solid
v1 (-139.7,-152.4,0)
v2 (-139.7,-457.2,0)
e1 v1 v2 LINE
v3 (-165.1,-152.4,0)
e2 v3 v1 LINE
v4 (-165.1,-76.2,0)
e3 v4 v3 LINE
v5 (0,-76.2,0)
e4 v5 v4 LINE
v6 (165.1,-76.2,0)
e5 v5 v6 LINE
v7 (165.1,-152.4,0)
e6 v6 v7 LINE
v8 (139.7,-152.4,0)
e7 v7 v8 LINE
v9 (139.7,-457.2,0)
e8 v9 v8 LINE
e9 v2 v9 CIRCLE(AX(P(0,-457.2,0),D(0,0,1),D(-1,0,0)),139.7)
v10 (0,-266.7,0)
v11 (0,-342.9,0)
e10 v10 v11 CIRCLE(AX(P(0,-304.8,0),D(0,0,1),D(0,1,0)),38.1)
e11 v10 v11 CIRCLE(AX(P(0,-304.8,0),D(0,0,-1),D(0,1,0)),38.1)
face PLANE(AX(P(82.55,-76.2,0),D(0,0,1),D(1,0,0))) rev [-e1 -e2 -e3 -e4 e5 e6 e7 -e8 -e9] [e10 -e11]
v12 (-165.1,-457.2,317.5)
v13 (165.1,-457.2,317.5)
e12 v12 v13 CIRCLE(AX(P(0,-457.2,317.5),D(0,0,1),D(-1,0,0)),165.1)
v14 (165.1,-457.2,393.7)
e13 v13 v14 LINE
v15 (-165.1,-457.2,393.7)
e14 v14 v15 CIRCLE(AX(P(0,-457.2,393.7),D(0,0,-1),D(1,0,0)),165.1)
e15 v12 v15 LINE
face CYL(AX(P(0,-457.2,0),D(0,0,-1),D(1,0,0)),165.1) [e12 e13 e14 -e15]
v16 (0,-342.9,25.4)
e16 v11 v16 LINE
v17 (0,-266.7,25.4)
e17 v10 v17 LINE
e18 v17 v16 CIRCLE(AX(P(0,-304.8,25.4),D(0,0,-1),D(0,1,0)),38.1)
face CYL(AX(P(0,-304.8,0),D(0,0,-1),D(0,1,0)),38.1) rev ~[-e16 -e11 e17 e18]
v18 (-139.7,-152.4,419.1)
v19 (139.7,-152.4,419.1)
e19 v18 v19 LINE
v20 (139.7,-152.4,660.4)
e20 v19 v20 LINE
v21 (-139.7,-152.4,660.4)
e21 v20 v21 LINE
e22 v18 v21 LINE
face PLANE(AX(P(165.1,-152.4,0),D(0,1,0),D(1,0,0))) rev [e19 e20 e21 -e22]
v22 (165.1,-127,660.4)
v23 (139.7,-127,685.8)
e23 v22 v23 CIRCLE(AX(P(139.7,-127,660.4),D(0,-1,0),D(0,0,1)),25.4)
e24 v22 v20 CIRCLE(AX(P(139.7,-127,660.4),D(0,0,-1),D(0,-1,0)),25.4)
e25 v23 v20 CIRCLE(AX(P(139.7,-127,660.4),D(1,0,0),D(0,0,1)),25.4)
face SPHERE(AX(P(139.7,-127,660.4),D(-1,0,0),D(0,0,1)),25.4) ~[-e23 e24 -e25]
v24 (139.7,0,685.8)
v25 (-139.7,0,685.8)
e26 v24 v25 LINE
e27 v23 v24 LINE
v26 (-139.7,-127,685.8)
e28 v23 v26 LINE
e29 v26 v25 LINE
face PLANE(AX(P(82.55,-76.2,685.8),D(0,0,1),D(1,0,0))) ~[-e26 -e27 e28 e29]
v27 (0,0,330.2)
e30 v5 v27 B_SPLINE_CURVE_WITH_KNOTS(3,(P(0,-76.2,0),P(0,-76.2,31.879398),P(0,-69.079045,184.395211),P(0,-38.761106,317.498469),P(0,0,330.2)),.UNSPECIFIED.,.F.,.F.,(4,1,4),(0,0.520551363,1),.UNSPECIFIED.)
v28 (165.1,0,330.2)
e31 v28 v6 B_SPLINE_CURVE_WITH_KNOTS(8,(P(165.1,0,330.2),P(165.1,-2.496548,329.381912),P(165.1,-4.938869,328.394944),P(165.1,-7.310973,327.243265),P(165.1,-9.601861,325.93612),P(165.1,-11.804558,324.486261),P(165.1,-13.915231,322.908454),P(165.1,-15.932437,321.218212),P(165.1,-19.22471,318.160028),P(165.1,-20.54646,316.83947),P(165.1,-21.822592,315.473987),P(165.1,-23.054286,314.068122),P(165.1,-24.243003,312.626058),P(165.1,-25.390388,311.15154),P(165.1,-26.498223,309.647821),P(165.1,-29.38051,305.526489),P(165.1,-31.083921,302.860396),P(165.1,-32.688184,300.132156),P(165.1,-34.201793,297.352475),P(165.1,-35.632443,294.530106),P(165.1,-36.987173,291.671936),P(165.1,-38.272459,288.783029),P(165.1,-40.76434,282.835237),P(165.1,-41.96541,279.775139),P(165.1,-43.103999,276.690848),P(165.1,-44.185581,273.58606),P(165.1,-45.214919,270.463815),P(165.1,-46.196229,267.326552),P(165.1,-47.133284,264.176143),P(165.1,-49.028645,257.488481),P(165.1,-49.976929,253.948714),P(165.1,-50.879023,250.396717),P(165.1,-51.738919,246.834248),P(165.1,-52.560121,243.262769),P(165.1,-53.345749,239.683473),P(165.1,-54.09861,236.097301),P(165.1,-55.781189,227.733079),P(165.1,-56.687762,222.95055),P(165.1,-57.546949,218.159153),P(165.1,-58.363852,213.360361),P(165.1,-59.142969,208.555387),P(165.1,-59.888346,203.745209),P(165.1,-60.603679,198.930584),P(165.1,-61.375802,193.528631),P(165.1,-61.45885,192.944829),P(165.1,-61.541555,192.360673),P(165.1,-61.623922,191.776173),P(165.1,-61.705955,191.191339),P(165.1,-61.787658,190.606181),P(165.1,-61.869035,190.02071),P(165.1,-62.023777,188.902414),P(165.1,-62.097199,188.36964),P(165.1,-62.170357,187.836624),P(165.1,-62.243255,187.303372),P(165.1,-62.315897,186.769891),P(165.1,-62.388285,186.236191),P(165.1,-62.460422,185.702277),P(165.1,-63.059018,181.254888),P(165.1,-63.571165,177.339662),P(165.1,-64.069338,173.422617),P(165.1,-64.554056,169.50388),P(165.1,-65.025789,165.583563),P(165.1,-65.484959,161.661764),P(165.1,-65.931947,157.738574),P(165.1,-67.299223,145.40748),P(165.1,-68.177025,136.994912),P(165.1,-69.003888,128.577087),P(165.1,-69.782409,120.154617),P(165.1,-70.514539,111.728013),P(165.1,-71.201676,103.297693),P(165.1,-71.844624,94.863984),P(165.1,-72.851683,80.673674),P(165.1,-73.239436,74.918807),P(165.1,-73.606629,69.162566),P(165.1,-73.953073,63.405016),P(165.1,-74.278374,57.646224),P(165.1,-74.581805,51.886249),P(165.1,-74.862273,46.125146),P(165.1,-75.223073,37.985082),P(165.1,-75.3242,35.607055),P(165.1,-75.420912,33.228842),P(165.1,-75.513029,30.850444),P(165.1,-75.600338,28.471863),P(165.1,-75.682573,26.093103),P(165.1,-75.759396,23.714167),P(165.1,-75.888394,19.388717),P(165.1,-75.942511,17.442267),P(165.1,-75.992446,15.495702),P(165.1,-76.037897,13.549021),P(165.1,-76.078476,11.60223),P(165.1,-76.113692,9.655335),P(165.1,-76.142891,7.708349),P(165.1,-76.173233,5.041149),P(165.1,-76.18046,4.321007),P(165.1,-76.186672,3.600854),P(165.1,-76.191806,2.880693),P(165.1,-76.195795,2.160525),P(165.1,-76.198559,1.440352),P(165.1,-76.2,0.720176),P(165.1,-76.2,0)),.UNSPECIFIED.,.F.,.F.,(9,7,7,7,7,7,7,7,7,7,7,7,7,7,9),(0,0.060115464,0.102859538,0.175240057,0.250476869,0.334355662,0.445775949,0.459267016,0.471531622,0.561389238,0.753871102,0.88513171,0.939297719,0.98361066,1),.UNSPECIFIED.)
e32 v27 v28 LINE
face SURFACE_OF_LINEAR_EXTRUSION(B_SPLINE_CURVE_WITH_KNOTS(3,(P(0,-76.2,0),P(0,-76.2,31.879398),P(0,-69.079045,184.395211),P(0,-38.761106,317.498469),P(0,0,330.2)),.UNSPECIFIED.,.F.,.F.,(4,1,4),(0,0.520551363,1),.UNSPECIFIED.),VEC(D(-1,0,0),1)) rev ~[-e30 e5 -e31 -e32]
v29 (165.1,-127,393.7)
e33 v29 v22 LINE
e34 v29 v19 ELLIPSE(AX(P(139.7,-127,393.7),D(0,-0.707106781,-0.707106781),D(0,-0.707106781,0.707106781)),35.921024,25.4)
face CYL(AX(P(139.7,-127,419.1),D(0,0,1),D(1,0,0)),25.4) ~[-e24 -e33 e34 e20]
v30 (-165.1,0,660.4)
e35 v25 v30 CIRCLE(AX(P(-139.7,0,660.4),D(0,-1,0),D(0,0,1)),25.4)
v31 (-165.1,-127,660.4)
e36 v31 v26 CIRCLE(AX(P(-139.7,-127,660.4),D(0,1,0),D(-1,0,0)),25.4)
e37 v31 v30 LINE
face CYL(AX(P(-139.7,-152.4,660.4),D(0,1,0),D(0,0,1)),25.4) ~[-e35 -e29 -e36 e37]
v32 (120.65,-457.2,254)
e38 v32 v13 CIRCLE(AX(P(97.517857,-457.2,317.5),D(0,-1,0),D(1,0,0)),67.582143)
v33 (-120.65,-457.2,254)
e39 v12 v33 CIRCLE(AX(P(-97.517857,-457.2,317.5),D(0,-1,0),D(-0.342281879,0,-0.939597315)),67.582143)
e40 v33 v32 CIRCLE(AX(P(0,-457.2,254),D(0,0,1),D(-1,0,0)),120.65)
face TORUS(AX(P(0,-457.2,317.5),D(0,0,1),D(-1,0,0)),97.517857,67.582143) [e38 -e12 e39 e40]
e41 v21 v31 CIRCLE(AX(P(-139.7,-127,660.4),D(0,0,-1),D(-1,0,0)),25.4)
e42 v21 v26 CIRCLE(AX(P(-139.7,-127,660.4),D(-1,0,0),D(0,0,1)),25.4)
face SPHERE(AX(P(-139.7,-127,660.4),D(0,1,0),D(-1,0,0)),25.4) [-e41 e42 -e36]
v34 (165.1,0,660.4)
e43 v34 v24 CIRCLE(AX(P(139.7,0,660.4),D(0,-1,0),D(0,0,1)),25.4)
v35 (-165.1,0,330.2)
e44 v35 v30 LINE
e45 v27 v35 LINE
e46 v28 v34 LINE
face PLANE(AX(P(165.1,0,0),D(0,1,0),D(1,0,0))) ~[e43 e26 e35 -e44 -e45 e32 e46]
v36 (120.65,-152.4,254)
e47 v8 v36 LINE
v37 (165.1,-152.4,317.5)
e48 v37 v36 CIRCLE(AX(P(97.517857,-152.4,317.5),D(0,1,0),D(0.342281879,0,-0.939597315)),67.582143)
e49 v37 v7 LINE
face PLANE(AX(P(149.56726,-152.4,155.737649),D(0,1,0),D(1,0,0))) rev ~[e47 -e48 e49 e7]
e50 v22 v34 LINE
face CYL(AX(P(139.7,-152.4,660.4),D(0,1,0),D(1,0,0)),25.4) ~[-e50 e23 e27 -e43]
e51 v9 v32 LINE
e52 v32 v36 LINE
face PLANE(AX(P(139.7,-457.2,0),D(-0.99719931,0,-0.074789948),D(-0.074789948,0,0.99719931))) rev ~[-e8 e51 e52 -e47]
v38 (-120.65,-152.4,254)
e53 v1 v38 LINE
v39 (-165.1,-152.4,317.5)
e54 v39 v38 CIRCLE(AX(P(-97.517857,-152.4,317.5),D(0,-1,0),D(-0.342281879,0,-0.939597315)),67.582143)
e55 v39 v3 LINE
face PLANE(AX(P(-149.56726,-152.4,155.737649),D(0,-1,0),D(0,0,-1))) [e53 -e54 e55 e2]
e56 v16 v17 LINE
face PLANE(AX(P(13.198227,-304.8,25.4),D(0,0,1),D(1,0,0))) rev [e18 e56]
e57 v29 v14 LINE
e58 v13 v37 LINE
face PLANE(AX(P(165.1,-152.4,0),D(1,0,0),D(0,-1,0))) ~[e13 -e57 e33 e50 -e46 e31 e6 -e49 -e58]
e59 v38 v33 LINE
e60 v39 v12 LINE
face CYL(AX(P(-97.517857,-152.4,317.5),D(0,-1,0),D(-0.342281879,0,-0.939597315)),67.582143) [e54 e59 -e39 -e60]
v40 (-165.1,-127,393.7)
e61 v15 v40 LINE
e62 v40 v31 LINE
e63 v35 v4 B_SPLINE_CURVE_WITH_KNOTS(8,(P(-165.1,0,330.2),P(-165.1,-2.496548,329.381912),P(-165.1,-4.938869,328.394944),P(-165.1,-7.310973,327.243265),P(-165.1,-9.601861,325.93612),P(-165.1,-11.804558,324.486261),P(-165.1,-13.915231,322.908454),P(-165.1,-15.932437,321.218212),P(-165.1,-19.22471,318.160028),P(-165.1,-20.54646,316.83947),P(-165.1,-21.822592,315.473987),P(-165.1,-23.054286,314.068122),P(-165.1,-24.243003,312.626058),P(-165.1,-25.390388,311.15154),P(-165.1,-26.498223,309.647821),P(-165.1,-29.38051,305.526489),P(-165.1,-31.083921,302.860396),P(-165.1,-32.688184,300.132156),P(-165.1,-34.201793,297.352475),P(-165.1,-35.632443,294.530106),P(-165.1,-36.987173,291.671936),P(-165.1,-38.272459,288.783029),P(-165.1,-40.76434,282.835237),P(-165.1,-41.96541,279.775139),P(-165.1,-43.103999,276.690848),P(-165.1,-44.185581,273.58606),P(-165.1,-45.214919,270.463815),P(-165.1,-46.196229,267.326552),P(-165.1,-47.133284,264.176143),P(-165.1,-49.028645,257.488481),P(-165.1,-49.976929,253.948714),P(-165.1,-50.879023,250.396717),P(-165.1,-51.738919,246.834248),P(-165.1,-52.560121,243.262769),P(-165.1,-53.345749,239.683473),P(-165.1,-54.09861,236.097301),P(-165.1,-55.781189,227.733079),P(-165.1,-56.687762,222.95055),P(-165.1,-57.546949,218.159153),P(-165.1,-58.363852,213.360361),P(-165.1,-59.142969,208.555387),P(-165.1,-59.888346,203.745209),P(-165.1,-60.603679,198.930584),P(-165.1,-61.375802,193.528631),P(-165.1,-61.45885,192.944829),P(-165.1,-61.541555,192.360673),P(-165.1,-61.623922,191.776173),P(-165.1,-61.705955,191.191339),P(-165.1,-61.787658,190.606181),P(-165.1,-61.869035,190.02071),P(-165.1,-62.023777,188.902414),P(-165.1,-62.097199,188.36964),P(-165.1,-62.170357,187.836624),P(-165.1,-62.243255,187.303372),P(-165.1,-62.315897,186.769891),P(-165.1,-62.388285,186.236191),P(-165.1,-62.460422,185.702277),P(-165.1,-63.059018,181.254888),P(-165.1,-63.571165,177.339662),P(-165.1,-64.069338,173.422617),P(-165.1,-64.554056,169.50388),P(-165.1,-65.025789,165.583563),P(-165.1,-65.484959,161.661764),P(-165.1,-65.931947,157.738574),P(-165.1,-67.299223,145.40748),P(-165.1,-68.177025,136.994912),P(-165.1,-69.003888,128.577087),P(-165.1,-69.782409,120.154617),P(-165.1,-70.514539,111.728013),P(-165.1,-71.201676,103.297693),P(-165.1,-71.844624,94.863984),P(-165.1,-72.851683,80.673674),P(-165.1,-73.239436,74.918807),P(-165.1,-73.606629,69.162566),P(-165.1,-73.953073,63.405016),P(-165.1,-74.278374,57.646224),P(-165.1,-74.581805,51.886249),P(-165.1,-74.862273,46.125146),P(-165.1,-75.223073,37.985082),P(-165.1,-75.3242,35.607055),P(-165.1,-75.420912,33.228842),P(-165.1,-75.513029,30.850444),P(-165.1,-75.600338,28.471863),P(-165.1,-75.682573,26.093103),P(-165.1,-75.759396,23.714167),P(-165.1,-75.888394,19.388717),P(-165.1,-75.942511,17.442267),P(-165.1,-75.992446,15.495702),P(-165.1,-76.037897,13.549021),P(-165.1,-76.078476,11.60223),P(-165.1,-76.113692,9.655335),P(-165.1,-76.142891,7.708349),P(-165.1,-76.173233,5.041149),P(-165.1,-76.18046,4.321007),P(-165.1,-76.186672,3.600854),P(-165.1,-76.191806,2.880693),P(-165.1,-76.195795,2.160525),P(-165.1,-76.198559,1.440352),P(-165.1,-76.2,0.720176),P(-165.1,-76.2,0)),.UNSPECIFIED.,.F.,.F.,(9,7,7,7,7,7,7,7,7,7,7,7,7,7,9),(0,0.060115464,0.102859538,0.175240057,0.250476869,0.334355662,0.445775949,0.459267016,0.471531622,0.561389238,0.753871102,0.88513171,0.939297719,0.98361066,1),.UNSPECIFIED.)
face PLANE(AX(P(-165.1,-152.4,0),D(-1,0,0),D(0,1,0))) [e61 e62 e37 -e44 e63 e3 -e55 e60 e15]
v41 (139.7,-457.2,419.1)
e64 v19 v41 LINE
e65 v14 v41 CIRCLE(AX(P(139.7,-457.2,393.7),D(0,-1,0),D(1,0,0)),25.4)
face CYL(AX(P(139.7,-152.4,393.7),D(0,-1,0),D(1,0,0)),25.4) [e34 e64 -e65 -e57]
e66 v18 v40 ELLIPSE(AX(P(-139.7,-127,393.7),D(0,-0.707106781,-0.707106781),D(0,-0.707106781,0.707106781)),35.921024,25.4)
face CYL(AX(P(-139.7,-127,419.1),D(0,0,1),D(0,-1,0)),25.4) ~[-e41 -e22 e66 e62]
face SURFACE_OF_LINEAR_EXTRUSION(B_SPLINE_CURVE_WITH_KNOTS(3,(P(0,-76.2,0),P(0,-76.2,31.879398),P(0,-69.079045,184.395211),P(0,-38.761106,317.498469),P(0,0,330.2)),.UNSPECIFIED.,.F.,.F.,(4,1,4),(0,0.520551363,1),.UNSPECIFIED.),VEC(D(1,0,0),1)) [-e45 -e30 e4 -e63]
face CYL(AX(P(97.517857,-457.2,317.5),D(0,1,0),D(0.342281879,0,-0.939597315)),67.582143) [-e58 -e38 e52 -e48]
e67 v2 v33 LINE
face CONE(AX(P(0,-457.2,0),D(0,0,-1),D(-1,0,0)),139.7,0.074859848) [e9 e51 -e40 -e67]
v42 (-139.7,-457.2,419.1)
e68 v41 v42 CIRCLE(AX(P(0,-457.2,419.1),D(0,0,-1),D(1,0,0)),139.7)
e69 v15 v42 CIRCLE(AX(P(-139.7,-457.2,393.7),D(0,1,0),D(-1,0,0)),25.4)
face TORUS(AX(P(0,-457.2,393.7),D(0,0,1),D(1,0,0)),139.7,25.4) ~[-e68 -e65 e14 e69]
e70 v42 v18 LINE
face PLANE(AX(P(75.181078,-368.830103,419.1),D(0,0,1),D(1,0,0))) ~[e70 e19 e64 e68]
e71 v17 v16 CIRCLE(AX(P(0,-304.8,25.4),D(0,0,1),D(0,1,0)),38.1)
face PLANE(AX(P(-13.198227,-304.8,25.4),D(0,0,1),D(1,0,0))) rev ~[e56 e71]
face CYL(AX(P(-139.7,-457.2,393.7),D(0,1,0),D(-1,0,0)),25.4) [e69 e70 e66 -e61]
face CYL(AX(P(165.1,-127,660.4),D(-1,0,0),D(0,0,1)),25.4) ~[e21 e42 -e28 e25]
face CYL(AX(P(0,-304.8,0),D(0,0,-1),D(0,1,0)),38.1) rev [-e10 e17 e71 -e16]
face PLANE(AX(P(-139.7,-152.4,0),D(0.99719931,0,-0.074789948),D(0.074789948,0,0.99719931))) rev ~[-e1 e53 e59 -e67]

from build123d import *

# Parameters (mm, degrees)
F0_R          = 12.7
F1_DEPTH      = 419.1
F0_W          = 165.1
F0_H          = 152.4
F2_DEPTH      = 685.8
F3_DEPTH      = 25.4
F8_DEPTH      = 165.1010001
F8_DEPTH_BACK = 165.1010001
F9_R          = 25.4


with BuildPart() as f1:
    # F0 (on Top) → F1 (new body)
    with BuildSketch(Plane.XY):
        with BuildLine():
            Line((0, -266.7), (0, -152.4))
            Line((0, -152.4), (-165.1, -152.4))
            Line((-165.1, -152.4), (-165.1, -457.2))
            ThreePointArc((-165.1, -457.2), (-116.7433295739, -573.9433295739), (0, -622.3))
            Line((0, -622.3), (0, -342.9))
            ThreePointArc((0, -342.9), (-38.1, -304.8), (0, -266.7))
        make_face()
        with Locations((-101.6, -203.2)):
            Circle(F0_R, mode=Mode.SUBTRACT)
        with Locations((-101.6, -203.2)):
            Circle(F0_R)
        with BuildLine():
            Line((0, -342.9), (0, -266.7))
            ThreePointArc((0, -266.7), (-38.1, -304.8), (0, -342.9))
        make_face()
    extrude(amount=F1_DEPTH)

    # F0 (on Top) → F2 (join)
    with BuildSketch(Plane.XY):
        with Locations((-82.55, -76.2)):
            Rectangle(F0_W, F0_H)
    extrude(amount=F2_DEPTH)

    # F0 (on Top) → F3 (cut)
    with BuildSketch(Plane.XY):
        with BuildLine():
            Line((0, -342.9), (0, -266.7))
            ThreePointArc((0, -266.7), (-38.1, -304.8), (0, -342.9))
        make_face()
    extrude(amount=F3_DEPTH, mode=Mode.SUBTRACT)

    # F4: F1 across face


with BuildPart() as f1_1:
    add(f1.part)
    add(f1.part.mirror(Plane(origin=(0, -279.3076736672, 257.3545234249), x_dir=(0, 1, 0), z_dir=(1, 0, 0))))

    # F6: sweep along a path in F6_path
    with BuildLine(Plane(origin=(-165.1, -152.4, 419.1), x_dir=(0, 1, 0), z_dir=(0, 0, 1))) as f6_path:
        Line((0, 0), (-304.8, 0))
        ThreePointArc((-304.8, 0), (-469.9, -165.1), (-304.8, -330.2))
        Line((-304.8, -330.2), (0, -330.2))
    # F5 (on face) → F6 (sweep, cut)
    with BuildSketch(Plane.XZ.offset(152.4)):
        with BuildLine():
            ThreePointArc((-120.65, 254), (-152.8833058285, 278.74418592), (-165.1, 317.5))
            Line((-165.1, 317.5), (-165.1, 0))
            Line((-165.1, 0), (-139.7, 0))
            Line((-139.7, 0), (-120.65, 254))
        make_face()
    sweep(path=f6_path.line, mode=Mode.SUBTRACT)

    # F7 (on Right) → F8 (cut, two sides)
    with BuildSketch(Plane.YZ) as f8_sk:
        with BuildLine():
            add(Edge.make_bspline(
                [(-76.2, 0), (-76.2, 31.8793983715), (-69.0790448855, 184.3952112859), (-38.761105776, 317.4984685435), (0, 330.2)],
                knots=[0, 0, 0, 0, 0.5205513628, 1, 1, 1, 1], degree=3))
            Line((-76.2, 0), (0, 0))
            Line((0, 0), (0, 330.2))
        make_face()
    extrude(amount=-F8_DEPTH, mode=Mode.SUBTRACT)
    extrude(f8_sk.sketch, amount=F8_DEPTH_BACK, mode=Mode.SUBTRACT)

    # F9
    f9_edges = [f1_1.edges().sort_by_distance(p)[0] for p in [
        (-165.1, -76.2, 685.8),
        (-165.1, -152.4, 552.45),
        (0, -152.4, 685.8),
        (165.1, -76.2, 685.8),
        (165.1, -152.4, 552.45),
        (165.1, -304.8, 419.1),
        (0, -622.3, 419.1),
        (-165.1, -304.8, 419.1),
    ]]
    fillet(f9_edges, radius=F9_R)


solid = f1_1.part
